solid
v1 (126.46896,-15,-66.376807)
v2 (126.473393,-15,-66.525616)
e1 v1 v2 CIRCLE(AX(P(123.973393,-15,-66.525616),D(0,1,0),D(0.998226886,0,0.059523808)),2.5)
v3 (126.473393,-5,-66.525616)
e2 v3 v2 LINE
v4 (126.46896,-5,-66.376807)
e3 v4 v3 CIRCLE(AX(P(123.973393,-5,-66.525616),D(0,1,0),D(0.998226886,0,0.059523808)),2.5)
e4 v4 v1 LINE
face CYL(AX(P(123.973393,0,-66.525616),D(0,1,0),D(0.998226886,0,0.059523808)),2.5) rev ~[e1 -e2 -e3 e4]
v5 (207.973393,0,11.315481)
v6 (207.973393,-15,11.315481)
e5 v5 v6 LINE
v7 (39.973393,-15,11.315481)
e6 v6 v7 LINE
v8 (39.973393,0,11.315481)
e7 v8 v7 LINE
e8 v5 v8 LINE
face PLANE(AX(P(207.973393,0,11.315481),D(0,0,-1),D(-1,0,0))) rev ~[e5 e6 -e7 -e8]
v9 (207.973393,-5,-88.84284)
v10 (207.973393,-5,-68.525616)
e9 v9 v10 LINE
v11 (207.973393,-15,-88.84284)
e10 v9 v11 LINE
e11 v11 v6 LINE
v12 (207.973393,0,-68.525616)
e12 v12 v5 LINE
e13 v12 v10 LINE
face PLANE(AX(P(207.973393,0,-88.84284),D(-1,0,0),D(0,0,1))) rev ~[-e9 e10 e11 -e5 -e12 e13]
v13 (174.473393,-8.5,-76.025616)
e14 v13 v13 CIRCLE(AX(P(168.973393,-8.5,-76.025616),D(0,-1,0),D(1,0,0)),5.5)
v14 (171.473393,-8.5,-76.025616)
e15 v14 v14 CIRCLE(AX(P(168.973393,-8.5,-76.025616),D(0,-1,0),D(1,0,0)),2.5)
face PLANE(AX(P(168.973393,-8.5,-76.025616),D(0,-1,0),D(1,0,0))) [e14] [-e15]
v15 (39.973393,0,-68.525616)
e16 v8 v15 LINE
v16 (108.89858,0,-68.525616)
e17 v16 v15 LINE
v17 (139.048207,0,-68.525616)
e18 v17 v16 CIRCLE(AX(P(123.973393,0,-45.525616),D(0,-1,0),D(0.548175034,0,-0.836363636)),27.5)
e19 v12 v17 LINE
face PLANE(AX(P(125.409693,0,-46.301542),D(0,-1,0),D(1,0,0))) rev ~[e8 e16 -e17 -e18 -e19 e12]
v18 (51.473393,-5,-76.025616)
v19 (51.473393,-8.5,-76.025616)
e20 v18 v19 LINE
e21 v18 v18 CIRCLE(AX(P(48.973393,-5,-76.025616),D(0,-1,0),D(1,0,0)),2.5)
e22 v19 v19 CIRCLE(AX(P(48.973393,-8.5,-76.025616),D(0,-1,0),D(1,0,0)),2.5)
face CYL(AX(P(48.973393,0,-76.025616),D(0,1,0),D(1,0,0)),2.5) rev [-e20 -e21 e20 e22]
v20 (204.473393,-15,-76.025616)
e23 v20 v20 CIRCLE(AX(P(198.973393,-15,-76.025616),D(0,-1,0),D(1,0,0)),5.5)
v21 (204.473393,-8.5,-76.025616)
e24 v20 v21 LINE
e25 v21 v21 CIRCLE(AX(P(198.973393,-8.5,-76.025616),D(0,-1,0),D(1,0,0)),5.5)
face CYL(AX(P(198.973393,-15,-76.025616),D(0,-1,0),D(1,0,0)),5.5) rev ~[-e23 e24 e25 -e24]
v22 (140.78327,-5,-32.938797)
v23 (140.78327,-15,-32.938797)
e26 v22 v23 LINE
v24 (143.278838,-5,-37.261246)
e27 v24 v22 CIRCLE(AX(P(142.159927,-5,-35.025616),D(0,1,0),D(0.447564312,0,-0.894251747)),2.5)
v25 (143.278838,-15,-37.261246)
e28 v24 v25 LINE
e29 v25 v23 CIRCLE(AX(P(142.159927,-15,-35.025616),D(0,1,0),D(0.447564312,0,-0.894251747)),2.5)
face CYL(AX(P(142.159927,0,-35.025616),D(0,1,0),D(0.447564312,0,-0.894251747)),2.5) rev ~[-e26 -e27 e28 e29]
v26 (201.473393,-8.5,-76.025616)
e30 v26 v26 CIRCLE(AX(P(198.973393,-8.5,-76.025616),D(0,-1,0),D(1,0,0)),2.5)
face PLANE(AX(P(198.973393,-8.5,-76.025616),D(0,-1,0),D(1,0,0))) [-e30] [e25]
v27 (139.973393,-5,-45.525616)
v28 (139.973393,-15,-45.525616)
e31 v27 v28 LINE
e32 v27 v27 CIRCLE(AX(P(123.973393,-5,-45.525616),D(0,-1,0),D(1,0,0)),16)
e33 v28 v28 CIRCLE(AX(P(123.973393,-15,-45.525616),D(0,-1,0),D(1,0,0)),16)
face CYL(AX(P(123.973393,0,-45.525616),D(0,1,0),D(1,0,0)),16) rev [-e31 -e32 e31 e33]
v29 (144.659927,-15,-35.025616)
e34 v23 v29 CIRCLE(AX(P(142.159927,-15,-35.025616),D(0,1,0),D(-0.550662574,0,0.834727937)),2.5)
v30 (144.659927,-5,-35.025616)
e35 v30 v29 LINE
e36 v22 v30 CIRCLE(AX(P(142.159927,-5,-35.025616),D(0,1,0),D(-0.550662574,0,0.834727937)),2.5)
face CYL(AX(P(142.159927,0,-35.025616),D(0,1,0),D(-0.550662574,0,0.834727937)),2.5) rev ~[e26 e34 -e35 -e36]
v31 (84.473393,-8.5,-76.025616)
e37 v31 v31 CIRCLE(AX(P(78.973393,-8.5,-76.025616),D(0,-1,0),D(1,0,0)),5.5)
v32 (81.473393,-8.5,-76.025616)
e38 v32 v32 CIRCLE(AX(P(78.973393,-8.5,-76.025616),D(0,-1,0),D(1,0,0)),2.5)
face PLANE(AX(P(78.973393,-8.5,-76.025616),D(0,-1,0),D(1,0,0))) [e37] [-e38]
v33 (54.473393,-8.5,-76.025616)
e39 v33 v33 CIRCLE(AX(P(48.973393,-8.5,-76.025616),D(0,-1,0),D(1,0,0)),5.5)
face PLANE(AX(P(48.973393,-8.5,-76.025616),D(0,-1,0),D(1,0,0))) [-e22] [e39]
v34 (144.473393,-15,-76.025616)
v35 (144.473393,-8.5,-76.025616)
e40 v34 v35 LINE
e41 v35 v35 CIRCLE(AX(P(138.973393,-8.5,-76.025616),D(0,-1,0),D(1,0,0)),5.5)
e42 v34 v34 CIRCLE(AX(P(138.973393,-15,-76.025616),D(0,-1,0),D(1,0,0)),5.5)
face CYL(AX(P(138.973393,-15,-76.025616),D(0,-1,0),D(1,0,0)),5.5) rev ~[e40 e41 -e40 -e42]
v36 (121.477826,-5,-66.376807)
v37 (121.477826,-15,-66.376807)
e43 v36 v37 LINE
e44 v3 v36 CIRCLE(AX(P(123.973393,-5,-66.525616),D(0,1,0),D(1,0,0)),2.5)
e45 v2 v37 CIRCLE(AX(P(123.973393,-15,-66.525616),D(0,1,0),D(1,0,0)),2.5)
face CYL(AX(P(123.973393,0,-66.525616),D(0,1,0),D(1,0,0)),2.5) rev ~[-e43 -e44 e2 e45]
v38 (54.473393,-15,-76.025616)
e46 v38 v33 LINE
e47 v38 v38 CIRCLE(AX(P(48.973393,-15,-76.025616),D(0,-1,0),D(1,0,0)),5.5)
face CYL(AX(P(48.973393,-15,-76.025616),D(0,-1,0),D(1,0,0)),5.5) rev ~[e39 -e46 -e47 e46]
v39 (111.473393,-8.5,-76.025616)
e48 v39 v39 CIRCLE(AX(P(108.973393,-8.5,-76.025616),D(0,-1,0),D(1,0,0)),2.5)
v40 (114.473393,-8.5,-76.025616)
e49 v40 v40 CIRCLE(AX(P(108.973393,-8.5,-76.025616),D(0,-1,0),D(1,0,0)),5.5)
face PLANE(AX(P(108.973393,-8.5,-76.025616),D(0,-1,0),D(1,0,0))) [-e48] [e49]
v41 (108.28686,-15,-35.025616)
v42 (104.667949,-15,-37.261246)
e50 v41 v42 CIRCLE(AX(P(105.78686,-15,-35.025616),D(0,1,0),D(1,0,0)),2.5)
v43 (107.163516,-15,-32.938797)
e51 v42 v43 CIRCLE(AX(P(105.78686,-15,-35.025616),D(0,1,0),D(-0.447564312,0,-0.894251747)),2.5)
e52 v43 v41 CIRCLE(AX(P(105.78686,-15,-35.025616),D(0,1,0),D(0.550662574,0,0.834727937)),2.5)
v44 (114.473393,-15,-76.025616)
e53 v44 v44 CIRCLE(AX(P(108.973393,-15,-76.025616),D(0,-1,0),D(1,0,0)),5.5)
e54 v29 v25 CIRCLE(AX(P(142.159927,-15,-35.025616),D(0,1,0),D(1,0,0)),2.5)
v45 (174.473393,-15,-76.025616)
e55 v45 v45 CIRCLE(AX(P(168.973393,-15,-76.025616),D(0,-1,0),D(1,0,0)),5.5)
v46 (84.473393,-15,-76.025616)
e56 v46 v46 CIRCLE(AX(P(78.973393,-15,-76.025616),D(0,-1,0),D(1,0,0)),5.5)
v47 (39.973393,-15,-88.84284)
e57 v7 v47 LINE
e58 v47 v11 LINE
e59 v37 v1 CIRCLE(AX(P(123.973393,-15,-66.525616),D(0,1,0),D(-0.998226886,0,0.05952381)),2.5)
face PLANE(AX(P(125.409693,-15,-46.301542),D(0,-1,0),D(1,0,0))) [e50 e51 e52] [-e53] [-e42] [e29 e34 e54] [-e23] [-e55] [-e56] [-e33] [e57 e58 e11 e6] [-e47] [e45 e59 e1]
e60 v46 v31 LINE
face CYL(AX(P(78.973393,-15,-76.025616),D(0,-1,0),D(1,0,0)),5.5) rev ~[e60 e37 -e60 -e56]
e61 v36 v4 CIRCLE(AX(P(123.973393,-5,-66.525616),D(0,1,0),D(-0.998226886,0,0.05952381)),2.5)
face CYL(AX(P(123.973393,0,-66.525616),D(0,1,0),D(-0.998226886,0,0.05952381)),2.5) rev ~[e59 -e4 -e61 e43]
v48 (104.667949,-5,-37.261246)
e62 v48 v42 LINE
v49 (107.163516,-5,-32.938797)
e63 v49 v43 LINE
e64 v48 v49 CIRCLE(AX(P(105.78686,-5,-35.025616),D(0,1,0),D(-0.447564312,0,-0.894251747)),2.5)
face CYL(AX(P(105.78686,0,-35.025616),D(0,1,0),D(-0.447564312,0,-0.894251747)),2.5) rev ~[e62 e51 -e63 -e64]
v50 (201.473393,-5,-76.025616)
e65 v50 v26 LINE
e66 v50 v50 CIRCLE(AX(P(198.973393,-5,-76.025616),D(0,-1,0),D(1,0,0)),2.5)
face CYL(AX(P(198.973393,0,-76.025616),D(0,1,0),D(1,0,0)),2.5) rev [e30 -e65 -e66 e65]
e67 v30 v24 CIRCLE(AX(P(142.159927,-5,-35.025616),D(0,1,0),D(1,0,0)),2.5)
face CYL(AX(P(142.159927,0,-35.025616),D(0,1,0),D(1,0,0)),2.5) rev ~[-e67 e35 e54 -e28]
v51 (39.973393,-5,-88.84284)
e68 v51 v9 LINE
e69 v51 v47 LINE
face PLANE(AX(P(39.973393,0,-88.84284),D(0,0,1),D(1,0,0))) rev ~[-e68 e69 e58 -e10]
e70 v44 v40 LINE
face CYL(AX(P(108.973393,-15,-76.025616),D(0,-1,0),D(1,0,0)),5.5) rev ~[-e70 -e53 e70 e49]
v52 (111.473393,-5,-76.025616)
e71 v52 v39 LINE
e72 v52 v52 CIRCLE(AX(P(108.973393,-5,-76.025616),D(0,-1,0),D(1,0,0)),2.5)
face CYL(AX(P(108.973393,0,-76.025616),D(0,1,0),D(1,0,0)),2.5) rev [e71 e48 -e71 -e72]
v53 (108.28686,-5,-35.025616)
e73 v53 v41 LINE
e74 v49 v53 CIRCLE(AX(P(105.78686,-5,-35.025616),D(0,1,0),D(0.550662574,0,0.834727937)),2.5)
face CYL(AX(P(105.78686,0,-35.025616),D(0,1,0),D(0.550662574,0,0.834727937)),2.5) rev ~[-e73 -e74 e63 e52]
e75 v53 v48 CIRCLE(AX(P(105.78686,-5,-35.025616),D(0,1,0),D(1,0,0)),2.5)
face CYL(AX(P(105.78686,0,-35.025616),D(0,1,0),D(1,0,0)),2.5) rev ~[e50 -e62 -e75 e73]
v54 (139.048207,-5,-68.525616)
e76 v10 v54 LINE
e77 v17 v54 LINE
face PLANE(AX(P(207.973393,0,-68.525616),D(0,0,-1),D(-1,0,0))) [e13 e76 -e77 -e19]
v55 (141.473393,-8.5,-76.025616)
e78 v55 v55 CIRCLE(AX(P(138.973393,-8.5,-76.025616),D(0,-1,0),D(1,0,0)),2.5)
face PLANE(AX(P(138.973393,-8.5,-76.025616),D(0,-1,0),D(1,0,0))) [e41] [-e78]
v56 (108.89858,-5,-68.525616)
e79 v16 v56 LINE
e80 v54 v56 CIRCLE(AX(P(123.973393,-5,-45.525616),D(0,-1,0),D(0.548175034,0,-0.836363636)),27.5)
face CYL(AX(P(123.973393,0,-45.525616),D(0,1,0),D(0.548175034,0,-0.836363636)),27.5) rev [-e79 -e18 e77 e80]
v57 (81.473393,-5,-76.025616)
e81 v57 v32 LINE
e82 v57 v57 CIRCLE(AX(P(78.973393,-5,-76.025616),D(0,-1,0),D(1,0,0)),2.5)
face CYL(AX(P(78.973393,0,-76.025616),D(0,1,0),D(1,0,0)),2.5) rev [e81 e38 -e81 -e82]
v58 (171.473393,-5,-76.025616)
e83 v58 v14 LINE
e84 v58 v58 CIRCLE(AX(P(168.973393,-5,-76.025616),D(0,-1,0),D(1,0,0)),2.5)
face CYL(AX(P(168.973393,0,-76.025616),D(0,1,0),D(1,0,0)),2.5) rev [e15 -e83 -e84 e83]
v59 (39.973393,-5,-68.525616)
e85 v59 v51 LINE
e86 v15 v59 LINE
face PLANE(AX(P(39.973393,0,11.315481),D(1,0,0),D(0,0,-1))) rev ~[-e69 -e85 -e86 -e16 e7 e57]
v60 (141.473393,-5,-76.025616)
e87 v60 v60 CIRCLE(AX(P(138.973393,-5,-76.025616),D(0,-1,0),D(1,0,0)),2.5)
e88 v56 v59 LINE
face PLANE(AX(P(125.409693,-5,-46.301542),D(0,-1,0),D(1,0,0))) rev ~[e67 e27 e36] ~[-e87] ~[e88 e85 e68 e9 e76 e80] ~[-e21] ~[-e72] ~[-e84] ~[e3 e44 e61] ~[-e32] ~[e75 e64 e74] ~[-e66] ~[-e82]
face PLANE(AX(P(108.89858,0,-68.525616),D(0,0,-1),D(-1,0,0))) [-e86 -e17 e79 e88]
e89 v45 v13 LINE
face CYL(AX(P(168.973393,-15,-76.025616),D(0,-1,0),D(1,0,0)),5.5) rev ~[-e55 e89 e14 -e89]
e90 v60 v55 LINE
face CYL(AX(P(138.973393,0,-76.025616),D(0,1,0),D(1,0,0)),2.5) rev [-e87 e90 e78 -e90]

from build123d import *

# Parameters (mm, degrees)
F0_R     = 16
F0_R_2   = 2.5
F1_DEPTH = 15
F2_DEPTH = 5
F3_R     = 5.5
F3_R_2   = 2.5
F4_DEPTH = 6.5


# Not quite as in the source:
# - a feature names something its author has since deleted; it is built from what else it names


with BuildPart() as f1:
    # F0 (on Front) → F1 (new body)
    with BuildSketch(Plane.XZ):
        with BuildLine():
            ThreePointArc((139.0482066844, -68.5256164076), (148.1685102123, -58.5964356365), (151.4733932528, -45.5256164076))
            ThreePointArc((151.4733932528, -45.5256164076), (110.9025740239, -21.3304994481), (108.8985798211, -68.5256164076))
            ThreePointArc((108.8985798211, -68.5256164076), (123.9733932528, -73.0256164076), (139.0482066844, -68.5256164076))
        make_face()
        with BuildLine():
            ThreePointArc((104.6679489936, -37.2612457748), (103.6217962638, -33.7756164076), (107.1635162088, -32.9387965643))
            ThreePointArc((107.1635162088, -32.9387965643), (123.9733932528, -24.5256164076), (140.7832702967, -32.9387965643))
            ThreePointArc((140.7832702967, -32.9387965643), (143.344907515, -32.8242939541), (144.6599267322, -35.0256164076))
            ThreePointArc((144.6599267322, -35.0256164076), (144.2868114199, -36.3395271829), (143.2788375119, -37.2612457748))
            ThreePointArc((143.2788375119, -37.2612457748), (144.5453927842, -41.307460972), (144.9733932528, -45.5256164076))
            ThreePointArc((144.9733932528, -45.5256164076), (139.6801897358, -59.4646459377), (126.468960468, -66.3768068838))
            ThreePointArc((126.468960468, -66.3768068838), (126.4722848108, -66.4511786418), (126.4733932528, -66.5256164076))
            ThreePointArc((126.4733932528, -66.5256164076), (123.8989554869, -69.0245079657), (121.4778260376, -66.3768068838))
            ThreePointArc((121.4778260376, -66.3768068838), (105.7868597733, -56.0256164076), (104.6679489936, -37.2612457748))
        make_face(mode=Mode.SUBTRACT)
        with BuildLine():
            ThreePointArc((107.1635162088, -32.9387965643), (107.9881822268, -33.8406356249), (108.2868597733, -35.0256164076))
            ThreePointArc((108.2868597733, -35.0256164076), (107.1007705486, -37.1525010953), (104.6679489936, -37.2612457748))
            ThreePointArc((104.6679489936, -37.2612457748), (105.7868597733, -56.0256164076), (121.4778260376, -66.3768068838))
            ThreePointArc((121.4778260376, -66.3768068838), (123.9733932528, -64.0256164076), (126.468960468, -66.3768068838))
            ThreePointArc((126.468960468, -66.3768068838), (139.6801897358, -59.4646459377), (144.9733932528, -45.5256164076))
            ThreePointArc((144.9733932528, -45.5256164076), (144.5453927842, -41.307460972), (143.2788375119, -37.2612457748))
            ThreePointArc((143.2788375119, -37.2612457748), (139.9948632228, -36.2756164076), (140.7832702967, -32.9387965643))
            ThreePointArc((140.7832702967, -32.9387965643), (123.9733932528, -24.5256164076), (107.1635162088, -32.9387965643))
        make_face()
        with Locations((123.9733932528, -45.5256164076)):
            Circle(F0_R, mode=Mode.SUBTRACT)
        with BuildLine():
            ThreePointArc((108.8985798211, -68.5256164076), (110.9025740239, -21.3304994481), (151.4733932528, -45.5256164076))
            ThreePointArc((151.4733932528, -45.5256164076), (148.1685102123, -58.5964356365), (139.0482066844, -68.5256164076))
            Line((139.0482066844, -68.5256164076), (207.9733932528, -68.5256164076))
            Line((207.9733932528, -68.5256164076), (207.9733932528, 11.3154806698))
            Line((207.9733932528, 11.3154806698), (39.9733932528, 11.3154806698))
            Line((39.9733932528, 11.3154806698), (39.9733932528, -68.5256164076))
            Line((39.9733932528, -68.5256164076), (108.8985798211, -68.5256164076))
        make_face()
        with BuildLine():
            ThreePointArc((139.0482066844, -68.5256164076), (123.9733932528, -73.0256164076), (108.8985798211, -68.5256164076))
            Line((108.8985798211, -68.5256164076), (39.9733932528, -68.5256164076))
            Line((39.9733932528, -68.5256164076), (39.9733932528, -88.8428396075))
            Line((39.9733932528, -88.8428396075), (207.9733932528, -88.8428396075))
            Line((207.9733932528, -88.8428396075), (207.9733932528, -68.5256164076))
            Line((207.9733932528, -68.5256164076), (139.0482066844, -68.5256164076))
        make_face()
        with Locations((48.9733932528, -76.0256164076)):
            Circle(F0_R_2, mode=Mode.SUBTRACT)
        with Locations((78.9733932528, -76.0256164076)):
            Circle(F0_R_2, mode=Mode.SUBTRACT)
        with Locations((108.9733932528, -76.0256164076)):
            Circle(F0_R_2, mode=Mode.SUBTRACT)
        with Locations((138.9733932528, -76.0256164076)):
            Circle(F0_R_2, mode=Mode.SUBTRACT)
        with Locations((168.9733932528, -76.0256164076)):
            Circle(F0_R_2, mode=Mode.SUBTRACT)
        with Locations((198.9733932528, -76.0256164076)):
            Circle(F0_R_2, mode=Mode.SUBTRACT)
    extrude(amount=F1_DEPTH)

    # F0 (on Front) → F2 (cut)
    with BuildSketch(Plane.XZ):
        with BuildLine():
            ThreePointArc((139.0482066844, -68.5256164076), (148.1685102123, -58.5964356365), (151.4733932528, -45.5256164076))
            ThreePointArc((151.4733932528, -45.5256164076), (110.9025740239, -21.3304994481), (108.8985798211, -68.5256164076))
            ThreePointArc((108.8985798211, -68.5256164076), (123.9733932528, -73.0256164076), (139.0482066844, -68.5256164076))
        make_face()
        with BuildLine():
            ThreePointArc((104.6679489936, -37.2612457748), (103.6217962638, -33.7756164076), (107.1635162088, -32.9387965643))
            ThreePointArc((107.1635162088, -32.9387965643), (123.9733932528, -24.5256164076), (140.7832702967, -32.9387965643))
            ThreePointArc((140.7832702967, -32.9387965643), (143.344907515, -32.8242939541), (144.6599267322, -35.0256164076))
            ThreePointArc((144.6599267322, -35.0256164076), (144.2868114199, -36.3395271829), (143.2788375119, -37.2612457748))
            ThreePointArc((143.2788375119, -37.2612457748), (144.5453927842, -41.307460972), (144.9733932528, -45.5256164076))
            ThreePointArc((144.9733932528, -45.5256164076), (139.6801897358, -59.4646459377), (126.468960468, -66.3768068838))
            ThreePointArc((126.468960468, -66.3768068838), (126.4722848108, -66.4511786418), (126.4733932528, -66.5256164076))
            ThreePointArc((126.4733932528, -66.5256164076), (123.8989554869, -69.0245079657), (121.4778260376, -66.3768068838))
            ThreePointArc((121.4778260376, -66.3768068838), (105.7868597733, -56.0256164076), (104.6679489936, -37.2612457748))
        make_face(mode=Mode.SUBTRACT)
        with BuildLine():
            ThreePointArc((107.1635162088, -32.9387965643), (107.9881822268, -33.8406356249), (108.2868597733, -35.0256164076))
            ThreePointArc((108.2868597733, -35.0256164076), (107.1007705486, -37.1525010953), (104.6679489936, -37.2612457748))
            ThreePointArc((104.6679489936, -37.2612457748), (105.7868597733, -56.0256164076), (121.4778260376, -66.3768068838))
            ThreePointArc((121.4778260376, -66.3768068838), (123.9733932528, -64.0256164076), (126.468960468, -66.3768068838))
            ThreePointArc((126.468960468, -66.3768068838), (139.6801897358, -59.4646459377), (144.9733932528, -45.5256164076))
            ThreePointArc((144.9733932528, -45.5256164076), (144.5453927842, -41.307460972), (143.2788375119, -37.2612457748))
            ThreePointArc((143.2788375119, -37.2612457748), (139.9948632228, -36.2756164076), (140.7832702967, -32.9387965643))
            ThreePointArc((140.7832702967, -32.9387965643), (123.9733932528, -24.5256164076), (107.1635162088, -32.9387965643))
        make_face()
        with Locations((123.9733932528, -45.5256164076)):
            Circle(F0_R, mode=Mode.SUBTRACT)
        with BuildLine():
            ThreePointArc((139.0482066844, -68.5256164076), (123.9733932528, -73.0256164076), (108.8985798211, -68.5256164076))
            Line((108.8985798211, -68.5256164076), (39.9733932528, -68.5256164076))
            Line((39.9733932528, -68.5256164076), (39.9733932528, -88.8428396075))
            Line((39.9733932528, -88.8428396075), (207.9733932528, -88.8428396075))
            Line((207.9733932528, -88.8428396075), (207.9733932528, -68.5256164076))
            Line((207.9733932528, -68.5256164076), (139.0482066844, -68.5256164076))
        make_face()
        with Locations((48.9733932528, -76.0256164076)):
            Circle(F0_R_2, mode=Mode.SUBTRACT)
        with Locations((78.9733932528, -76.0256164076)):
            Circle(F0_R_2, mode=Mode.SUBTRACT)
        with Locations((108.9733932528, -76.0256164076)):
            Circle(F0_R_2, mode=Mode.SUBTRACT)
        with Locations((138.9733932528, -76.0256164076)):
            Circle(F0_R_2, mode=Mode.SUBTRACT)
        with Locations((168.9733932528, -76.0256164076)):
            Circle(F0_R_2, mode=Mode.SUBTRACT)
        with Locations((198.9733932528, -76.0256164076)):
            Circle(F0_R_2, mode=Mode.SUBTRACT)
    extrude(amount=F2_DEPTH, mode=Mode.SUBTRACT)

    # F3 (on face) → F4 (cut)
    with BuildSketch(Plane.XZ.offset(15)):
        with Locations((198.9733932528, -76.0256164076)):
            Circle(F3_R)
        with Locations((198.9733932528, -76.0256164076)):
            Circle(F3_R_2, mode=Mode.SUBTRACT)
        with Locations((168.9733932528, -76.0256164076)):
            Circle(F3_R)
        with Locations((168.9733932528, -76.0256164076)):
            Circle(F3_R_2, mode=Mode.SUBTRACT)
        with Locations((138.9733932528, -76.0256164076)):
            Circle(F3_R)
        with Locations((138.9733932528, -76.0256164076)):
            Circle(F3_R_2, mode=Mode.SUBTRACT)
        with Locations((108.9733932528, -76.0256164076)):
            Circle(F3_R)
        with Locations((108.9733932528, -76.0256164076)):
            Circle(F3_R_2, mode=Mode.SUBTRACT)
        with Locations((78.9733932528, -76.0256164076)):
            Circle(F3_R)
        with Locations((78.9733932528, -76.0256164076)):
            Circle(F3_R_2, mode=Mode.SUBTRACT)
        with Locations((48.9733932528, -76.0256164076)):
            Circle(F3_R)
        with Locations((48.9733932528, -76.0256164076)):
            Circle(F3_R_2, mode=Mode.SUBTRACT)
    extrude(amount=-F4_DEPTH, mode=Mode.SUBTRACT)


solid = f1.part
